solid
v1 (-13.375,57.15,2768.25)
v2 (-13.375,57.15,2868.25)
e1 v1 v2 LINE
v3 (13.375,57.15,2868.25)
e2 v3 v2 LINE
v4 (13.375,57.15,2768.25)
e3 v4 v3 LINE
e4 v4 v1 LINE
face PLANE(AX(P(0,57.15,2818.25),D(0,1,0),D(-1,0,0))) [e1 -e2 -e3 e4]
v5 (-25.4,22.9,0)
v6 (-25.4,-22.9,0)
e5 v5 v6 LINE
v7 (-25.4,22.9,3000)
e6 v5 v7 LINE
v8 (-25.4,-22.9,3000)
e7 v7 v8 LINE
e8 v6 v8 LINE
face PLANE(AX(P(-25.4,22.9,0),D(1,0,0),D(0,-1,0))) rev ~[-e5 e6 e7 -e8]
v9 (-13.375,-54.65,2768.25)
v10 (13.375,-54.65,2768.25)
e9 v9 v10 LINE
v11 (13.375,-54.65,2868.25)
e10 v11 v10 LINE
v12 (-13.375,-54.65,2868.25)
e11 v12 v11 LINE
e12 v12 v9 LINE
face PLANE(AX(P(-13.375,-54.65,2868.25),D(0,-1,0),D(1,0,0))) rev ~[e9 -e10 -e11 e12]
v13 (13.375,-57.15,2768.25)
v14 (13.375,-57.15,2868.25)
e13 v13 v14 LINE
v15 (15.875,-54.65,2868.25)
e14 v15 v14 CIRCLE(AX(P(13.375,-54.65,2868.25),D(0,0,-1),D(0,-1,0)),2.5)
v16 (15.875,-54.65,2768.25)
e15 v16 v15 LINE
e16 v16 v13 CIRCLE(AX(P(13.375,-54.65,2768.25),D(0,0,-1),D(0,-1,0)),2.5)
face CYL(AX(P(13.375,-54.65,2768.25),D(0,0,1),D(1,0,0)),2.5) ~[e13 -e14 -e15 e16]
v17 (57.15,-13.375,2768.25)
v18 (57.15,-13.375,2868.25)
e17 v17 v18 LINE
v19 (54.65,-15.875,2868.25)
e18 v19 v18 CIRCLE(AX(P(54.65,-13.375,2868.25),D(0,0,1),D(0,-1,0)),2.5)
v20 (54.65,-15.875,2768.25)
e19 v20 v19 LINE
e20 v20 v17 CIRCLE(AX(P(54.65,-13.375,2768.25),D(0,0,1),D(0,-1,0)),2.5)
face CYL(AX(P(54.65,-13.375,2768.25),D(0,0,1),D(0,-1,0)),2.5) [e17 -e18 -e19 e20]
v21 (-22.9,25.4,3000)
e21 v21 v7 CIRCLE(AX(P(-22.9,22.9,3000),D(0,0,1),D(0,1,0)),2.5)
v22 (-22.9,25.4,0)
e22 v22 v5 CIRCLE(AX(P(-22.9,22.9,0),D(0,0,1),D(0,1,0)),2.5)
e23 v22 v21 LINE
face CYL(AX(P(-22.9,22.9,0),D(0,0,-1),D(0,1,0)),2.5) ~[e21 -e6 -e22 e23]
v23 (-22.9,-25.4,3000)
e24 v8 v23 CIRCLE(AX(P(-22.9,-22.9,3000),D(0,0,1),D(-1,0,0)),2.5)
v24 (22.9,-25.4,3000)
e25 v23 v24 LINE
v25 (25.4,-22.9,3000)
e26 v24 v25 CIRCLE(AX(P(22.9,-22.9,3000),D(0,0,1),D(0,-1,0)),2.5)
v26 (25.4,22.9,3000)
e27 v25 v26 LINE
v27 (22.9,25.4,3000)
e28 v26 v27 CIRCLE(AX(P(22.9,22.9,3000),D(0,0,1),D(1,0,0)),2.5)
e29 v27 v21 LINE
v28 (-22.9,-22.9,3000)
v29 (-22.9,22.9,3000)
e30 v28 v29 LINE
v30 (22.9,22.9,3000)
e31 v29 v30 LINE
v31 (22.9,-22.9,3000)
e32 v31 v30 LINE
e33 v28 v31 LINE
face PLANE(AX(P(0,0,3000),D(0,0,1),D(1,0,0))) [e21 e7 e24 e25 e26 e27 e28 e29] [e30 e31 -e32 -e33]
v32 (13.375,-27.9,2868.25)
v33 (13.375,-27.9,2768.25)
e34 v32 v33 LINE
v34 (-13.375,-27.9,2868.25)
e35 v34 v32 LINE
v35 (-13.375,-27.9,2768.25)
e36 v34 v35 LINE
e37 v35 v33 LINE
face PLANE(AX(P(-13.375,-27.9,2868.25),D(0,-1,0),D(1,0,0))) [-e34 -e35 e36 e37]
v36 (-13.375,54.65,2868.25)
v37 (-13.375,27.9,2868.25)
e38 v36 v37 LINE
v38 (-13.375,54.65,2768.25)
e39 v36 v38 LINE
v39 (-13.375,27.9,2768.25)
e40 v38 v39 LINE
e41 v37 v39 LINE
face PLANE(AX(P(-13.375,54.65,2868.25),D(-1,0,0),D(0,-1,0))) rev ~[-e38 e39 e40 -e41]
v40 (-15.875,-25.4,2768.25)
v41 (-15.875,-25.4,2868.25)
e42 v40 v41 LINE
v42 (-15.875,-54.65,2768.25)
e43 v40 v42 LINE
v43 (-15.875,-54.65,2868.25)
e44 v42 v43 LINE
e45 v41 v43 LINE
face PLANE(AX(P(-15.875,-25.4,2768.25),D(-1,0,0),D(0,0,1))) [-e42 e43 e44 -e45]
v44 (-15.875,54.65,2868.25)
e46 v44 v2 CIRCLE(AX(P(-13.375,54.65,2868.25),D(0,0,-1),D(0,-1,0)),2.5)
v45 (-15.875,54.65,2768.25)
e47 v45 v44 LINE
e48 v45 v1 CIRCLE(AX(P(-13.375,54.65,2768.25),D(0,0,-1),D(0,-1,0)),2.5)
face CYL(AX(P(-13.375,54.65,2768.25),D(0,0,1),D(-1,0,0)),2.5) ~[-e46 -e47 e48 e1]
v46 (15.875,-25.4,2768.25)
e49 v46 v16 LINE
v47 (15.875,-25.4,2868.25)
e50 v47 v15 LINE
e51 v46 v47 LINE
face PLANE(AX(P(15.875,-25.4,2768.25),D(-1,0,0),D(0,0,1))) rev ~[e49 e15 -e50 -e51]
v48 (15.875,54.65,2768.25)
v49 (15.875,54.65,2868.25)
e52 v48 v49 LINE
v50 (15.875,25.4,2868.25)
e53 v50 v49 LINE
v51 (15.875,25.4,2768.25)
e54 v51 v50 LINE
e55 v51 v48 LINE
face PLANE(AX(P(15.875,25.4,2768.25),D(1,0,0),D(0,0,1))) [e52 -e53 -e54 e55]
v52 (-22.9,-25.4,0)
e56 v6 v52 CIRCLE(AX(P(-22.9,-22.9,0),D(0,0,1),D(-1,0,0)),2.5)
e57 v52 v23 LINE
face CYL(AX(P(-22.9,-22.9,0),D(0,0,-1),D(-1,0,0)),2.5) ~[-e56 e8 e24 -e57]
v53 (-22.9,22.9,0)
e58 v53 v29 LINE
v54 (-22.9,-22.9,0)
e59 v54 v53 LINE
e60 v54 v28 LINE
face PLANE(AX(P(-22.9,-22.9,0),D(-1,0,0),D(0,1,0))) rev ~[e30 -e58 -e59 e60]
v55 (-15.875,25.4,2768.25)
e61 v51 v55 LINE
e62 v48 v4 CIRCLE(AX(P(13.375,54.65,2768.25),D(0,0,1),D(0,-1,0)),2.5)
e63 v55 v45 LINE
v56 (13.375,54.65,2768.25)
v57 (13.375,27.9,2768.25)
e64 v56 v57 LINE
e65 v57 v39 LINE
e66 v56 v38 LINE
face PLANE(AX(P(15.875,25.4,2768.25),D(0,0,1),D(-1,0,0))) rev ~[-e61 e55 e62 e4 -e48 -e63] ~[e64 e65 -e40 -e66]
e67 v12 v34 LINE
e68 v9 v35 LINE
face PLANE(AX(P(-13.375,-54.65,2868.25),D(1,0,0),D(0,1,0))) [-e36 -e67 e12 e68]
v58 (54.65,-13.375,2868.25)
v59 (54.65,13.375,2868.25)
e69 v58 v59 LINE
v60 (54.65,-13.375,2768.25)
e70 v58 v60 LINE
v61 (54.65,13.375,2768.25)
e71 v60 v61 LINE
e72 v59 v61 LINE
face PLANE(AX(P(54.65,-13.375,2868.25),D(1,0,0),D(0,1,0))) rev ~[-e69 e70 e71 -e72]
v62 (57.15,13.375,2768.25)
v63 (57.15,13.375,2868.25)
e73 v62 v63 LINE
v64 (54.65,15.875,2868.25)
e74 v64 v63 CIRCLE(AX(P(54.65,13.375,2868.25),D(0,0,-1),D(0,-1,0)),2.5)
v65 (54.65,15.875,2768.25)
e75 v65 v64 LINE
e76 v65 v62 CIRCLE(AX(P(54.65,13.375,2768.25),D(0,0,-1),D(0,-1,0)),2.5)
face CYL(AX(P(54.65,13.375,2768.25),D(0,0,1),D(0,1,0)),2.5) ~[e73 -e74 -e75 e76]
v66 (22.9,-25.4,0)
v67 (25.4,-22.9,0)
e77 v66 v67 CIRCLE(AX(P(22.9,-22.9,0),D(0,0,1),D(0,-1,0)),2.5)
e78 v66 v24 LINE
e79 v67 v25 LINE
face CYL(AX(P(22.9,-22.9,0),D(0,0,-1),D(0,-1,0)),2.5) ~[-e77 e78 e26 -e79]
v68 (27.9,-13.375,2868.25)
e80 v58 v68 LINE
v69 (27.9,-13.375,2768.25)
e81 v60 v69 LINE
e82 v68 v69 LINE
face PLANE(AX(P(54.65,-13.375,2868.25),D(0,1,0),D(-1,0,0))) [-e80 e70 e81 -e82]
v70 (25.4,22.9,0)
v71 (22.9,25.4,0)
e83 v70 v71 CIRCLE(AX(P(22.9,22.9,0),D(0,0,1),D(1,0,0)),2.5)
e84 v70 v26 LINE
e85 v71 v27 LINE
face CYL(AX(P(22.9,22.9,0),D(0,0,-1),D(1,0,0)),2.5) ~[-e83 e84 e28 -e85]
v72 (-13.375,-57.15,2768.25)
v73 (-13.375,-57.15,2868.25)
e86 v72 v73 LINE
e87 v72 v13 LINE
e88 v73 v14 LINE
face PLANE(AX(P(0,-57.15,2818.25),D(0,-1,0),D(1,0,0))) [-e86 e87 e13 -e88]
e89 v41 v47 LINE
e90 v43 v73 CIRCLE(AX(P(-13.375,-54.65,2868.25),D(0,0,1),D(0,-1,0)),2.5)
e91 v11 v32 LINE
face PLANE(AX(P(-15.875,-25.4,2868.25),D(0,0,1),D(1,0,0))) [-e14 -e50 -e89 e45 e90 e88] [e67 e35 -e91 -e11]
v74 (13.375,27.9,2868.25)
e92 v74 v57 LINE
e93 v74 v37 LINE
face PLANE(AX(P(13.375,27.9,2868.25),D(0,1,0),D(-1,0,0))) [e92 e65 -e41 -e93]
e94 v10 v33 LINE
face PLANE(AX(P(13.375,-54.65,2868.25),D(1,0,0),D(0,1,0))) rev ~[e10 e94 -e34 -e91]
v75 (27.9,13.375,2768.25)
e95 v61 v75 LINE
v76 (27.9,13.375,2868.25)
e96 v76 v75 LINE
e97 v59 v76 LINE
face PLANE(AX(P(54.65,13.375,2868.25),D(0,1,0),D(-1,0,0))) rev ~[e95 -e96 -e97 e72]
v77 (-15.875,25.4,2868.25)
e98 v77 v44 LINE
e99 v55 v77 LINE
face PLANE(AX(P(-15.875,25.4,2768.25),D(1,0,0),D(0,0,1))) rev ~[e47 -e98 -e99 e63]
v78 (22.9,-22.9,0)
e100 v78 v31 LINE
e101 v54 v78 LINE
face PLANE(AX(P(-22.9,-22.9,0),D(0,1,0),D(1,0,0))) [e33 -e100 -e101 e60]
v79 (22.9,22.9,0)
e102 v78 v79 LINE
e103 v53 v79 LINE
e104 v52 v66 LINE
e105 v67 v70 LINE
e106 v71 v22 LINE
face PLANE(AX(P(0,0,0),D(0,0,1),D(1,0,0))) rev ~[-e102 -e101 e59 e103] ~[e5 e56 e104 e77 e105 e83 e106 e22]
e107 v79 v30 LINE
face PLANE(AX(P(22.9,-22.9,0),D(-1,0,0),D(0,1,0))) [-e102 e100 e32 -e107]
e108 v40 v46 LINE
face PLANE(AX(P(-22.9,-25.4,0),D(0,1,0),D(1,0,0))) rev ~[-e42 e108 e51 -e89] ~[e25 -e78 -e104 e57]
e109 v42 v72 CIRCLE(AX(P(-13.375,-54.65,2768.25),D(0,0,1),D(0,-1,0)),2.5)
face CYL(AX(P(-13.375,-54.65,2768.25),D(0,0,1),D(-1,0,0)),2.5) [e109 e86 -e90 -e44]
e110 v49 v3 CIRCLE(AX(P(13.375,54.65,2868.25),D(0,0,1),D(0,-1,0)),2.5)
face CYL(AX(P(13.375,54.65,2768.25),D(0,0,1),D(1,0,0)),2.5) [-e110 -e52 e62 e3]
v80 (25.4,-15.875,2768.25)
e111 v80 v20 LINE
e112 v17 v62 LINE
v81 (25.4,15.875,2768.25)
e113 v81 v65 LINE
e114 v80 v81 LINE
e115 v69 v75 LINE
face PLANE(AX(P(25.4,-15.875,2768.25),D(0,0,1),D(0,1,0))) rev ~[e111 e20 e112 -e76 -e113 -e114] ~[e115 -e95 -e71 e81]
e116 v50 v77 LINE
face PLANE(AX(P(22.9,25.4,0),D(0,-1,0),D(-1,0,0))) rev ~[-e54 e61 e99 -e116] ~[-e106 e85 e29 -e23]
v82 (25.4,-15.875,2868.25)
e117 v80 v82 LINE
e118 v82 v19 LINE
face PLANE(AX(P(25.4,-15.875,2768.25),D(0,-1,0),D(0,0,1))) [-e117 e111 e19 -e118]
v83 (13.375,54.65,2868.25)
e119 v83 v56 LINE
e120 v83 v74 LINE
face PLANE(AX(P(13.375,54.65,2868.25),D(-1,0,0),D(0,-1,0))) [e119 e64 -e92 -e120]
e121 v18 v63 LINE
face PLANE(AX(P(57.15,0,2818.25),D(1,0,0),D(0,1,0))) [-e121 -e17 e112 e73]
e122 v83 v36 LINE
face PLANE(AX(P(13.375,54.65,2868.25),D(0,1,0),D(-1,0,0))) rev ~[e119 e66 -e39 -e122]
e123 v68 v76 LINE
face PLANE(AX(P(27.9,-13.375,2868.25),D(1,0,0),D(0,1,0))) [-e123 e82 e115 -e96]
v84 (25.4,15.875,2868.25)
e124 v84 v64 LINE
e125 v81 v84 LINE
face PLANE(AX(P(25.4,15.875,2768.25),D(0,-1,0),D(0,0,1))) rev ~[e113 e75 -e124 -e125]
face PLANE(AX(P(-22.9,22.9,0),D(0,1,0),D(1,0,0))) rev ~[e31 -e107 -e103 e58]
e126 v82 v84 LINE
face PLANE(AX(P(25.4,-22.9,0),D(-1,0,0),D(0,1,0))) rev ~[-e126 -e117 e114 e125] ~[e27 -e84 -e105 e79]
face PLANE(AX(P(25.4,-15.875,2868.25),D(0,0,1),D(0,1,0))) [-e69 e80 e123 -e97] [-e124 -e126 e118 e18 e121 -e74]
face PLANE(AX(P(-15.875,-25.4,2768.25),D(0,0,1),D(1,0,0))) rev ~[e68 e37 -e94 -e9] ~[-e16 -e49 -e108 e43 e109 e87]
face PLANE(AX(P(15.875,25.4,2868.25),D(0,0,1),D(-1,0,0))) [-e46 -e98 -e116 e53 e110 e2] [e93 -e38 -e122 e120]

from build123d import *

# Parameters (mm, degrees)
F0_W            = 45.8
F0_H            = 45.8
F1_DEPTH        = 3000
F2_W            = 31.75
F2_H            = 100
F3_DEPTH        = 31.75
F3_COPIES_COUNT = 3
F3_COPIES_ANGLE = 180
F4_R            = 2.5
F5_W            = 26.75
F5_H            = 26.75
F6_DEPTH        = 100
F6_COPIES_COUNT = 3
F6_COPIES_ANGLE = 180


# Not quite as in the source:
# - a pattern or mirror of a feature is missing from the dataset's text; its kind, count and spacing are read off the source's solid


with BuildPart() as f1:
    # F0 (on Top) → F1 (new body)
    with BuildSketch(Plane.XY):
        with BuildLine():
            ThreePointArc((25.4, 22.9), (24.667766953, 24.667766953), (22.9, 25.4))
            Line((22.9, 25.4), (-22.9, 25.4))
            ThreePointArc((-22.9, 25.4), (-24.667766953, 24.667766953), (-25.4, 22.9))
            Line((-25.4, 22.9), (-25.4, -22.9))
            ThreePointArc((-25.4, -22.9), (-24.667766953, -24.667766953), (-22.9, -25.4))
            Line((-22.9, -25.4), (22.9, -25.4))
            ThreePointArc((22.9, -25.4), (24.667766953, -24.667766953), (25.4, -22.9))
            Line((25.4, -22.9), (25.4, 22.9))
        make_face()
        Rectangle(F0_W, F0_H, mode=Mode.SUBTRACT)
    extrude(amount=F1_DEPTH)

    # F2 (on face) → F3 (join)
    with BuildSketch(Plane.XZ.offset(25.4)):
        with Locations((0, 2818.25)):
            Rectangle(F2_W, F2_H)
    f3 = extrude(amount=F3_DEPTH)

    # F3_copies: F3 ×3 about axis
    f3_copies_axis = Axis((0, 0, 0), (0, 0, 1))
    for i in range(1, F3_COPIES_COUNT):
        add(f3.rotate(f3_copies_axis, i * F3_COPIES_ANGLE / (F3_COPIES_COUNT - 1)))

    # F4
    f4_edges = [f1.edges().sort_by_distance(p)[0] for p in [
        (-15.875, -57.15, 2818.25),
        (15.875, -57.15, 2818.25),
        (57.15, -15.875, 2818.25),
        (57.15, 15.875, 2818.25),
        (15.875, 57.15, 2818.25),
        (-15.875, 57.15, 2818.25),
    ]]
    fillet(f4_edges, radius=F4_R)

    # F5 (on face) → F6 (cut, through all)
    with BuildSketch(Plane.XY.offset(2868.25)):
        with Locations((0, -41.275)):
            Rectangle(F5_W, F5_H)
    f6 = extrude(amount=-F6_DEPTH, mode=Mode.SUBTRACT)

    # F6_copies: F6 ×3 about axis
    f6_copies_axis = Axis((0, 0, 0), (0, 0, 1))
    for i in range(1, F6_COPIES_COUNT):
        add(f6.rotate(f6_copies_axis, i * F6_COPIES_ANGLE / (F6_COPIES_COUNT - 1)), mode=Mode.SUBTRACT)


solid = f1.part
